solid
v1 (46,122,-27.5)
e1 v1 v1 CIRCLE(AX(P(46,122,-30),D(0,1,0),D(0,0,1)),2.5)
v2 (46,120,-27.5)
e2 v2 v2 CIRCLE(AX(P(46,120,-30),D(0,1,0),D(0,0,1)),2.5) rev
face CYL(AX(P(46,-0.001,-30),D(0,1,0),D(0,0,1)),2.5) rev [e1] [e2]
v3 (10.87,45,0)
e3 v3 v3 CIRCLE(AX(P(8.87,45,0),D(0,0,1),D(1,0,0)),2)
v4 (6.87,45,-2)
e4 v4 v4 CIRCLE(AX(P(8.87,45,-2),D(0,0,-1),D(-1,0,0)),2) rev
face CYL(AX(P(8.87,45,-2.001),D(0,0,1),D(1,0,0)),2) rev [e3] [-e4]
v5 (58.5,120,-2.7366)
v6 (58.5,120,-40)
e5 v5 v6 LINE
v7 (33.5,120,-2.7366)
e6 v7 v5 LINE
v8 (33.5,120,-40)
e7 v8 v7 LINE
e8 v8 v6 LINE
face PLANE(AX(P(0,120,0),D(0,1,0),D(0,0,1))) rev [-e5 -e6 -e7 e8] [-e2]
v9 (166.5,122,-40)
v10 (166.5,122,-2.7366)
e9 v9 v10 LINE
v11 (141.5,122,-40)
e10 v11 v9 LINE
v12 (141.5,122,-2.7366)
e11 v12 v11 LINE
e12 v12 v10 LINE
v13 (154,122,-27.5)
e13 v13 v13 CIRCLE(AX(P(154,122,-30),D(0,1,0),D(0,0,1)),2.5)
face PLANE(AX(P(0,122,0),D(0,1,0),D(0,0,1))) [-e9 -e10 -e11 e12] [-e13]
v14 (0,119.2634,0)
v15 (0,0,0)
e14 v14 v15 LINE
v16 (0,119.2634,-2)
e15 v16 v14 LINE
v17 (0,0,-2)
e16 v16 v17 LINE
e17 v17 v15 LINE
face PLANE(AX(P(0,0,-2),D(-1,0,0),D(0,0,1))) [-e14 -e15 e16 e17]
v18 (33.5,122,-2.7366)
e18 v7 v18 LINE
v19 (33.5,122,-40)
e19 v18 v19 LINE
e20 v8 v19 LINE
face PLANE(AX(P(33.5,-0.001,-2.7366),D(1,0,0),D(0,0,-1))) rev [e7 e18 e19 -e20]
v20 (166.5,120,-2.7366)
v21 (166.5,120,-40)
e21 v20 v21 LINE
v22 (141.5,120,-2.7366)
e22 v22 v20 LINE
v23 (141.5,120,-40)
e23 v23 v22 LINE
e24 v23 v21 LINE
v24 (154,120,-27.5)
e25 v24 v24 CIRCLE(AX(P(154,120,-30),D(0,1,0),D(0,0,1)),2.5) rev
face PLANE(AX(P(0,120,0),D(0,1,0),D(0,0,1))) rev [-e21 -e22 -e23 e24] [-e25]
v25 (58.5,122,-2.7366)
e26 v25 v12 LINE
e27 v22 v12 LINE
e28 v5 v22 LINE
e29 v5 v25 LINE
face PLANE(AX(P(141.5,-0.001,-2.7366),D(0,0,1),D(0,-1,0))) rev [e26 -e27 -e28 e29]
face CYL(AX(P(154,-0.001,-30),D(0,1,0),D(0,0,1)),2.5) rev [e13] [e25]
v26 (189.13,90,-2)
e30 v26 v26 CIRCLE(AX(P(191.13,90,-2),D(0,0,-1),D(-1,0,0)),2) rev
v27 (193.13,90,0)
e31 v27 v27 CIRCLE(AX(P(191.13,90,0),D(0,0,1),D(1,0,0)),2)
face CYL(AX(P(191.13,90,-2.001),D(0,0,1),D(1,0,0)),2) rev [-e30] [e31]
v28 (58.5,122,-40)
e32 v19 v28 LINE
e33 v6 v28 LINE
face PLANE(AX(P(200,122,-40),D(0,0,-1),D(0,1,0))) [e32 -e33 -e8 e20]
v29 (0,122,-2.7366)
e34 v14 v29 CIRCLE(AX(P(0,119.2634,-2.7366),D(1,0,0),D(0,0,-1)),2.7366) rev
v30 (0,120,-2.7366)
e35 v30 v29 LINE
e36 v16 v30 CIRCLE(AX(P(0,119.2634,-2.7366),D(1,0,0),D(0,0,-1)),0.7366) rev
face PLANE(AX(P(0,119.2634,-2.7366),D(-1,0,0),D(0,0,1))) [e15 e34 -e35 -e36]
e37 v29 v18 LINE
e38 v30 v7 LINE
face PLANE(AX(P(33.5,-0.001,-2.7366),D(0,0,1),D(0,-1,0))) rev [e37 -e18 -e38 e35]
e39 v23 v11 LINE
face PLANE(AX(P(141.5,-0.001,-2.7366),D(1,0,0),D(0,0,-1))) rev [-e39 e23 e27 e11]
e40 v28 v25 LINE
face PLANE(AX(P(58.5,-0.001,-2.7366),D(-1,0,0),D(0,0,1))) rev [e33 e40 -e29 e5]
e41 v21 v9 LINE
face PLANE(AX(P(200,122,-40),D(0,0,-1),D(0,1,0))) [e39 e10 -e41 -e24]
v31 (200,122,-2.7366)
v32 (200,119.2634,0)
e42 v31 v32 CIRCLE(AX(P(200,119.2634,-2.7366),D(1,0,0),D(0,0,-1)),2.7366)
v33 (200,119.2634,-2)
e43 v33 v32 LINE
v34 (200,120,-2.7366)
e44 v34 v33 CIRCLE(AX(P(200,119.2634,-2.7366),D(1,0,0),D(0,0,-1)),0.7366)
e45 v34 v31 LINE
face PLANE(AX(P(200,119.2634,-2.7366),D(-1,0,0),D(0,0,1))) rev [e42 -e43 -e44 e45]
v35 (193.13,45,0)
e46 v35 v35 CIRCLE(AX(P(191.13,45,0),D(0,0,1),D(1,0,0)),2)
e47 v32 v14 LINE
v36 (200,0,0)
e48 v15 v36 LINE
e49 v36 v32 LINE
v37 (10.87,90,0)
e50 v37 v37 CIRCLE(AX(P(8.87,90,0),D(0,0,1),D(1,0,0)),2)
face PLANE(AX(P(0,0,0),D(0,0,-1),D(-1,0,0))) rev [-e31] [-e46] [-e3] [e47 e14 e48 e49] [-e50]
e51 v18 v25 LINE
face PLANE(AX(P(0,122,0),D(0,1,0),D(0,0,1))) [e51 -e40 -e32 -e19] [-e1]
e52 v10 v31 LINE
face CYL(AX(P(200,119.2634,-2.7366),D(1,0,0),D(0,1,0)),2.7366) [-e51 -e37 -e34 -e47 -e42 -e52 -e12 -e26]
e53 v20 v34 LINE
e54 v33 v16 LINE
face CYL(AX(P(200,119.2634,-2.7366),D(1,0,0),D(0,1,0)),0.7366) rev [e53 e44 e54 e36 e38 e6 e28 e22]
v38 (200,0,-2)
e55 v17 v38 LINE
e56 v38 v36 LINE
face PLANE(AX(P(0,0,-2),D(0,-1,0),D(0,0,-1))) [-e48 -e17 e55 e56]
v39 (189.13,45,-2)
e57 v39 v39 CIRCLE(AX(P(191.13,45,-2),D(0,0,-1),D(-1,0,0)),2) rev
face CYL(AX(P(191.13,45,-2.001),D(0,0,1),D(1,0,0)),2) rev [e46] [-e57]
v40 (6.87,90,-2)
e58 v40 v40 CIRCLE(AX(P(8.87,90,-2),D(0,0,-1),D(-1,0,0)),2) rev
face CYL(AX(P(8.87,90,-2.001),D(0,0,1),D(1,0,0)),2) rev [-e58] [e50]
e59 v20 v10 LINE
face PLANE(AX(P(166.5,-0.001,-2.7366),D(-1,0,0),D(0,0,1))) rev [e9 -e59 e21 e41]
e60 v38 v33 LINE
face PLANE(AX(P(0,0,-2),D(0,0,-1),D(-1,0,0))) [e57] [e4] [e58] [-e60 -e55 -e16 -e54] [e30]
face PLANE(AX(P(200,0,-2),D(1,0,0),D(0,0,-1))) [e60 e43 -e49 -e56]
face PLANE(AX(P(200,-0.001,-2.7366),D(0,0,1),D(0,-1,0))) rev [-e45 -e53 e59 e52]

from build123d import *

# Parameters (mm, degrees)
SKETCH2_W                    = 200
SKETCH2_H                    = 120
BASE_FLANGE1_DEPTH           = 2
CUT_EXTRUDE1_REACH           = 235.247
SKETCH7_R                    = 2
EDGE_FLANGE1_STRIP_W         = 9.4732
EDGE_FLANGE1_STRIP_H         = 2
EDGE_FLANGE1_STRIP_CUT_DEPTH = 200
EDGE_FLANGE1_DEPTH           = 200
CUT_EXTRUDE2_REACH           = 239.664
SKETCH11_R                   = 2.5
SKETCH11_W                   = 33.5
SKETCH11_H                   = 37.2634
SKETCH11_W_2                 = 83


# Sheet-metal steps are written as plain solids
with BuildPart() as part:
    # Sketch2 → Base-Flange1 (new body)
    with BuildSketch(Plane.XY):
        with Locations((100, 60)):
            Rectangle(SKETCH2_W, SKETCH2_H)
    extrude(amount=-BASE_FLANGE1_DEPTH)

    # Sketch7 → Cut-Extrude1 (cut, up to next)
    with BuildSketch(Plane.XY, mode=Mode.PRIVATE) as cut_extrude1_sk1:
        with Locations((8.87, 90)):
            Circle(SKETCH7_R)
    cut_extrude1_tool1 = extrude(cut_extrude1_sk1.sketch, amount=-CUT_EXTRUDE1_REACH, mode=Mode.PRIVATE) & part.part
    # Sketch7 → Cut-Extrude1 (cut, up to next)
    with BuildSketch(Plane.XY, mode=Mode.PRIVATE) as cut_extrude1_sk2:
        with Locations((8.87, 45)):
            Circle(SKETCH7_R)
    cut_extrude1_tool2 = extrude(cut_extrude1_sk2.sketch, amount=-CUT_EXTRUDE1_REACH, mode=Mode.PRIVATE) & part.part
    # Sketch7 → Cut-Extrude1 (cut, up to next)
    with BuildSketch(Plane.XY, mode=Mode.PRIVATE) as cut_extrude1_sk3:
        with Locations((191.13, 45)):
            Circle(SKETCH7_R)
    cut_extrude1_tool3 = extrude(cut_extrude1_sk3.sketch, amount=-CUT_EXTRUDE1_REACH, mode=Mode.PRIVATE) & part.part
    # Sketch7 → Cut-Extrude1 (cut, up to next)
    with BuildSketch(Plane.XY, mode=Mode.PRIVATE) as cut_extrude1_sk4:
        with Locations((191.13, 90)):
            Circle(SKETCH7_R)
    cut_extrude1_tool4 = extrude(cut_extrude1_sk4.sketch, amount=-CUT_EXTRUDE1_REACH, mode=Mode.PRIVATE) & part.part
    add(cut_extrude1_tool1.solids().sort_by_distance((8.87, 90, 0))[0], mode=Mode.SUBTRACT)
    add(cut_extrude1_tool2.solids().sort_by_distance((8.87, 45, 0))[0], mode=Mode.SUBTRACT)
    add(cut_extrude1_tool3.solids().sort_by_distance((191.13, 45, 0))[0], mode=Mode.SUBTRACT)
    add(cut_extrude1_tool4.solids().sort_by_distance((191.13, 90, 0))[0], mode=Mode.SUBTRACT)

    # Edge-Flange1 strip (across the edge) → Edge-Flange1 strip cut (cut)
    with BuildSketch(Plane(origin=(0, 120, -2), x_dir=(0, -1, 0), z_dir=(1, 0, 0))):
        with Locations((-4, -1)):
            Rectangle(EDGE_FLANGE1_STRIP_W, EDGE_FLANGE1_STRIP_H)
    extrude(amount=EDGE_FLANGE1_STRIP_CUT_DEPTH, mode=Mode.SUBTRACT)

    # Edge-Flange1 section (across the edge) → Edge-Flange1 (add)
    with BuildSketch(Plane(origin=(0, 120, -2), x_dir=(0, -1, 0), z_dir=(1, 0, 0))):
        with BuildLine():
            Line((-2, 0.7366), (-2, 38))
            Line((-2, 38), (0, 38))
            Line((0, 38), (0, 0.7366))
            ThreePointArc((0, 0.7366), (0.215745145, 0.215745145), (0.7366, 0))
            Line((0.7366, 0), (0.7366, -2))
            ThreePointArc((0.7366, -2), (-1.198468417, -1.198468417), (-2, 0.7366))
        make_face()
    extrude(amount=EDGE_FLANGE1_DEPTH)

    # Sketch11 → Cut-Extrude2 (cut, up to next)
    with BuildSketch(Plane(origin=(0, 122, 0), x_dir=(1, 0, 0), z_dir=(0, 1, 0)), mode=Mode.PRIVATE) as cut_extrude2_sk1:
        with Locations(Location((154, 30, 0), (0, 0, 270))):
            Circle(SKETCH11_R)
    cut_extrude2_tool1 = extrude(cut_extrude2_sk1.sketch, amount=-CUT_EXTRUDE2_REACH, mode=Mode.PRIVATE) & part.part
    # Sketch11 → Cut-Extrude2 (cut, up to next)
    with BuildSketch(Plane(origin=(0, 122, 0), x_dir=(1, 0, 0), z_dir=(0, 1, 0)), mode=Mode.PRIVATE) as cut_extrude2_sk2:
        with Locations(Location((46, 30, 0), (0, 0, 270))):
            Circle(SKETCH11_R)
    cut_extrude2_tool2 = extrude(cut_extrude2_sk2.sketch, amount=-CUT_EXTRUDE2_REACH, mode=Mode.PRIVATE) & part.part
    # Sketch11 → Cut-Extrude2 (cut, up to next)
    with BuildSketch(Plane(origin=(0, 122, 0), x_dir=(1, 0, 0), z_dir=(0, 1, 0)), mode=Mode.PRIVATE) as cut_extrude2_sk3:
        with Locations((183.25, 21.3683)):
            Rectangle(SKETCH11_W, SKETCH11_H)
    cut_extrude2_tool3 = extrude(cut_extrude2_sk3.sketch, amount=-CUT_EXTRUDE2_REACH, mode=Mode.PRIVATE) & part.part
    # Sketch11 → Cut-Extrude2 (cut, up to next)
    with BuildSketch(Plane(origin=(0, 122, 0), x_dir=(1, 0, 0), z_dir=(0, 1, 0)), mode=Mode.PRIVATE) as cut_extrude2_sk4:
        with Locations((100, 21.3683)):
            Rectangle(SKETCH11_W_2, SKETCH11_H)
    cut_extrude2_tool4 = extrude(cut_extrude2_sk4.sketch, amount=-CUT_EXTRUDE2_REACH, mode=Mode.PRIVATE) & part.part
    # Sketch11 → Cut-Extrude2 (cut, up to next)
    with BuildSketch(Plane(origin=(0, 122, 0), x_dir=(1, 0, 0), z_dir=(0, 1, 0)), mode=Mode.PRIVATE) as cut_extrude2_sk5:
        with Locations((16.75, 21.3683)):
            Rectangle(SKETCH11_W, SKETCH11_H)
    cut_extrude2_tool5 = extrude(cut_extrude2_sk5.sketch, amount=-CUT_EXTRUDE2_REACH, mode=Mode.PRIVATE) & part.part
    add(cut_extrude2_tool1.solids().sort_by_distance((154, 122, -30))[0], mode=Mode.SUBTRACT)
    add(cut_extrude2_tool2.solids().sort_by_distance((46, 122, -30))[0], mode=Mode.SUBTRACT)
    add(cut_extrude2_tool3.solids().sort_by_distance((183.25, 122, -21.3683))[0], mode=Mode.SUBTRACT)
    add(cut_extrude2_tool4.solids().sort_by_distance((100, 122, -21.3683))[0], mode=Mode.SUBTRACT)
    add(cut_extrude2_tool5.solids().sort_by_distance((16.75, 122, -21.3683))[0], mode=Mode.SUBTRACT)


solid = part.part
